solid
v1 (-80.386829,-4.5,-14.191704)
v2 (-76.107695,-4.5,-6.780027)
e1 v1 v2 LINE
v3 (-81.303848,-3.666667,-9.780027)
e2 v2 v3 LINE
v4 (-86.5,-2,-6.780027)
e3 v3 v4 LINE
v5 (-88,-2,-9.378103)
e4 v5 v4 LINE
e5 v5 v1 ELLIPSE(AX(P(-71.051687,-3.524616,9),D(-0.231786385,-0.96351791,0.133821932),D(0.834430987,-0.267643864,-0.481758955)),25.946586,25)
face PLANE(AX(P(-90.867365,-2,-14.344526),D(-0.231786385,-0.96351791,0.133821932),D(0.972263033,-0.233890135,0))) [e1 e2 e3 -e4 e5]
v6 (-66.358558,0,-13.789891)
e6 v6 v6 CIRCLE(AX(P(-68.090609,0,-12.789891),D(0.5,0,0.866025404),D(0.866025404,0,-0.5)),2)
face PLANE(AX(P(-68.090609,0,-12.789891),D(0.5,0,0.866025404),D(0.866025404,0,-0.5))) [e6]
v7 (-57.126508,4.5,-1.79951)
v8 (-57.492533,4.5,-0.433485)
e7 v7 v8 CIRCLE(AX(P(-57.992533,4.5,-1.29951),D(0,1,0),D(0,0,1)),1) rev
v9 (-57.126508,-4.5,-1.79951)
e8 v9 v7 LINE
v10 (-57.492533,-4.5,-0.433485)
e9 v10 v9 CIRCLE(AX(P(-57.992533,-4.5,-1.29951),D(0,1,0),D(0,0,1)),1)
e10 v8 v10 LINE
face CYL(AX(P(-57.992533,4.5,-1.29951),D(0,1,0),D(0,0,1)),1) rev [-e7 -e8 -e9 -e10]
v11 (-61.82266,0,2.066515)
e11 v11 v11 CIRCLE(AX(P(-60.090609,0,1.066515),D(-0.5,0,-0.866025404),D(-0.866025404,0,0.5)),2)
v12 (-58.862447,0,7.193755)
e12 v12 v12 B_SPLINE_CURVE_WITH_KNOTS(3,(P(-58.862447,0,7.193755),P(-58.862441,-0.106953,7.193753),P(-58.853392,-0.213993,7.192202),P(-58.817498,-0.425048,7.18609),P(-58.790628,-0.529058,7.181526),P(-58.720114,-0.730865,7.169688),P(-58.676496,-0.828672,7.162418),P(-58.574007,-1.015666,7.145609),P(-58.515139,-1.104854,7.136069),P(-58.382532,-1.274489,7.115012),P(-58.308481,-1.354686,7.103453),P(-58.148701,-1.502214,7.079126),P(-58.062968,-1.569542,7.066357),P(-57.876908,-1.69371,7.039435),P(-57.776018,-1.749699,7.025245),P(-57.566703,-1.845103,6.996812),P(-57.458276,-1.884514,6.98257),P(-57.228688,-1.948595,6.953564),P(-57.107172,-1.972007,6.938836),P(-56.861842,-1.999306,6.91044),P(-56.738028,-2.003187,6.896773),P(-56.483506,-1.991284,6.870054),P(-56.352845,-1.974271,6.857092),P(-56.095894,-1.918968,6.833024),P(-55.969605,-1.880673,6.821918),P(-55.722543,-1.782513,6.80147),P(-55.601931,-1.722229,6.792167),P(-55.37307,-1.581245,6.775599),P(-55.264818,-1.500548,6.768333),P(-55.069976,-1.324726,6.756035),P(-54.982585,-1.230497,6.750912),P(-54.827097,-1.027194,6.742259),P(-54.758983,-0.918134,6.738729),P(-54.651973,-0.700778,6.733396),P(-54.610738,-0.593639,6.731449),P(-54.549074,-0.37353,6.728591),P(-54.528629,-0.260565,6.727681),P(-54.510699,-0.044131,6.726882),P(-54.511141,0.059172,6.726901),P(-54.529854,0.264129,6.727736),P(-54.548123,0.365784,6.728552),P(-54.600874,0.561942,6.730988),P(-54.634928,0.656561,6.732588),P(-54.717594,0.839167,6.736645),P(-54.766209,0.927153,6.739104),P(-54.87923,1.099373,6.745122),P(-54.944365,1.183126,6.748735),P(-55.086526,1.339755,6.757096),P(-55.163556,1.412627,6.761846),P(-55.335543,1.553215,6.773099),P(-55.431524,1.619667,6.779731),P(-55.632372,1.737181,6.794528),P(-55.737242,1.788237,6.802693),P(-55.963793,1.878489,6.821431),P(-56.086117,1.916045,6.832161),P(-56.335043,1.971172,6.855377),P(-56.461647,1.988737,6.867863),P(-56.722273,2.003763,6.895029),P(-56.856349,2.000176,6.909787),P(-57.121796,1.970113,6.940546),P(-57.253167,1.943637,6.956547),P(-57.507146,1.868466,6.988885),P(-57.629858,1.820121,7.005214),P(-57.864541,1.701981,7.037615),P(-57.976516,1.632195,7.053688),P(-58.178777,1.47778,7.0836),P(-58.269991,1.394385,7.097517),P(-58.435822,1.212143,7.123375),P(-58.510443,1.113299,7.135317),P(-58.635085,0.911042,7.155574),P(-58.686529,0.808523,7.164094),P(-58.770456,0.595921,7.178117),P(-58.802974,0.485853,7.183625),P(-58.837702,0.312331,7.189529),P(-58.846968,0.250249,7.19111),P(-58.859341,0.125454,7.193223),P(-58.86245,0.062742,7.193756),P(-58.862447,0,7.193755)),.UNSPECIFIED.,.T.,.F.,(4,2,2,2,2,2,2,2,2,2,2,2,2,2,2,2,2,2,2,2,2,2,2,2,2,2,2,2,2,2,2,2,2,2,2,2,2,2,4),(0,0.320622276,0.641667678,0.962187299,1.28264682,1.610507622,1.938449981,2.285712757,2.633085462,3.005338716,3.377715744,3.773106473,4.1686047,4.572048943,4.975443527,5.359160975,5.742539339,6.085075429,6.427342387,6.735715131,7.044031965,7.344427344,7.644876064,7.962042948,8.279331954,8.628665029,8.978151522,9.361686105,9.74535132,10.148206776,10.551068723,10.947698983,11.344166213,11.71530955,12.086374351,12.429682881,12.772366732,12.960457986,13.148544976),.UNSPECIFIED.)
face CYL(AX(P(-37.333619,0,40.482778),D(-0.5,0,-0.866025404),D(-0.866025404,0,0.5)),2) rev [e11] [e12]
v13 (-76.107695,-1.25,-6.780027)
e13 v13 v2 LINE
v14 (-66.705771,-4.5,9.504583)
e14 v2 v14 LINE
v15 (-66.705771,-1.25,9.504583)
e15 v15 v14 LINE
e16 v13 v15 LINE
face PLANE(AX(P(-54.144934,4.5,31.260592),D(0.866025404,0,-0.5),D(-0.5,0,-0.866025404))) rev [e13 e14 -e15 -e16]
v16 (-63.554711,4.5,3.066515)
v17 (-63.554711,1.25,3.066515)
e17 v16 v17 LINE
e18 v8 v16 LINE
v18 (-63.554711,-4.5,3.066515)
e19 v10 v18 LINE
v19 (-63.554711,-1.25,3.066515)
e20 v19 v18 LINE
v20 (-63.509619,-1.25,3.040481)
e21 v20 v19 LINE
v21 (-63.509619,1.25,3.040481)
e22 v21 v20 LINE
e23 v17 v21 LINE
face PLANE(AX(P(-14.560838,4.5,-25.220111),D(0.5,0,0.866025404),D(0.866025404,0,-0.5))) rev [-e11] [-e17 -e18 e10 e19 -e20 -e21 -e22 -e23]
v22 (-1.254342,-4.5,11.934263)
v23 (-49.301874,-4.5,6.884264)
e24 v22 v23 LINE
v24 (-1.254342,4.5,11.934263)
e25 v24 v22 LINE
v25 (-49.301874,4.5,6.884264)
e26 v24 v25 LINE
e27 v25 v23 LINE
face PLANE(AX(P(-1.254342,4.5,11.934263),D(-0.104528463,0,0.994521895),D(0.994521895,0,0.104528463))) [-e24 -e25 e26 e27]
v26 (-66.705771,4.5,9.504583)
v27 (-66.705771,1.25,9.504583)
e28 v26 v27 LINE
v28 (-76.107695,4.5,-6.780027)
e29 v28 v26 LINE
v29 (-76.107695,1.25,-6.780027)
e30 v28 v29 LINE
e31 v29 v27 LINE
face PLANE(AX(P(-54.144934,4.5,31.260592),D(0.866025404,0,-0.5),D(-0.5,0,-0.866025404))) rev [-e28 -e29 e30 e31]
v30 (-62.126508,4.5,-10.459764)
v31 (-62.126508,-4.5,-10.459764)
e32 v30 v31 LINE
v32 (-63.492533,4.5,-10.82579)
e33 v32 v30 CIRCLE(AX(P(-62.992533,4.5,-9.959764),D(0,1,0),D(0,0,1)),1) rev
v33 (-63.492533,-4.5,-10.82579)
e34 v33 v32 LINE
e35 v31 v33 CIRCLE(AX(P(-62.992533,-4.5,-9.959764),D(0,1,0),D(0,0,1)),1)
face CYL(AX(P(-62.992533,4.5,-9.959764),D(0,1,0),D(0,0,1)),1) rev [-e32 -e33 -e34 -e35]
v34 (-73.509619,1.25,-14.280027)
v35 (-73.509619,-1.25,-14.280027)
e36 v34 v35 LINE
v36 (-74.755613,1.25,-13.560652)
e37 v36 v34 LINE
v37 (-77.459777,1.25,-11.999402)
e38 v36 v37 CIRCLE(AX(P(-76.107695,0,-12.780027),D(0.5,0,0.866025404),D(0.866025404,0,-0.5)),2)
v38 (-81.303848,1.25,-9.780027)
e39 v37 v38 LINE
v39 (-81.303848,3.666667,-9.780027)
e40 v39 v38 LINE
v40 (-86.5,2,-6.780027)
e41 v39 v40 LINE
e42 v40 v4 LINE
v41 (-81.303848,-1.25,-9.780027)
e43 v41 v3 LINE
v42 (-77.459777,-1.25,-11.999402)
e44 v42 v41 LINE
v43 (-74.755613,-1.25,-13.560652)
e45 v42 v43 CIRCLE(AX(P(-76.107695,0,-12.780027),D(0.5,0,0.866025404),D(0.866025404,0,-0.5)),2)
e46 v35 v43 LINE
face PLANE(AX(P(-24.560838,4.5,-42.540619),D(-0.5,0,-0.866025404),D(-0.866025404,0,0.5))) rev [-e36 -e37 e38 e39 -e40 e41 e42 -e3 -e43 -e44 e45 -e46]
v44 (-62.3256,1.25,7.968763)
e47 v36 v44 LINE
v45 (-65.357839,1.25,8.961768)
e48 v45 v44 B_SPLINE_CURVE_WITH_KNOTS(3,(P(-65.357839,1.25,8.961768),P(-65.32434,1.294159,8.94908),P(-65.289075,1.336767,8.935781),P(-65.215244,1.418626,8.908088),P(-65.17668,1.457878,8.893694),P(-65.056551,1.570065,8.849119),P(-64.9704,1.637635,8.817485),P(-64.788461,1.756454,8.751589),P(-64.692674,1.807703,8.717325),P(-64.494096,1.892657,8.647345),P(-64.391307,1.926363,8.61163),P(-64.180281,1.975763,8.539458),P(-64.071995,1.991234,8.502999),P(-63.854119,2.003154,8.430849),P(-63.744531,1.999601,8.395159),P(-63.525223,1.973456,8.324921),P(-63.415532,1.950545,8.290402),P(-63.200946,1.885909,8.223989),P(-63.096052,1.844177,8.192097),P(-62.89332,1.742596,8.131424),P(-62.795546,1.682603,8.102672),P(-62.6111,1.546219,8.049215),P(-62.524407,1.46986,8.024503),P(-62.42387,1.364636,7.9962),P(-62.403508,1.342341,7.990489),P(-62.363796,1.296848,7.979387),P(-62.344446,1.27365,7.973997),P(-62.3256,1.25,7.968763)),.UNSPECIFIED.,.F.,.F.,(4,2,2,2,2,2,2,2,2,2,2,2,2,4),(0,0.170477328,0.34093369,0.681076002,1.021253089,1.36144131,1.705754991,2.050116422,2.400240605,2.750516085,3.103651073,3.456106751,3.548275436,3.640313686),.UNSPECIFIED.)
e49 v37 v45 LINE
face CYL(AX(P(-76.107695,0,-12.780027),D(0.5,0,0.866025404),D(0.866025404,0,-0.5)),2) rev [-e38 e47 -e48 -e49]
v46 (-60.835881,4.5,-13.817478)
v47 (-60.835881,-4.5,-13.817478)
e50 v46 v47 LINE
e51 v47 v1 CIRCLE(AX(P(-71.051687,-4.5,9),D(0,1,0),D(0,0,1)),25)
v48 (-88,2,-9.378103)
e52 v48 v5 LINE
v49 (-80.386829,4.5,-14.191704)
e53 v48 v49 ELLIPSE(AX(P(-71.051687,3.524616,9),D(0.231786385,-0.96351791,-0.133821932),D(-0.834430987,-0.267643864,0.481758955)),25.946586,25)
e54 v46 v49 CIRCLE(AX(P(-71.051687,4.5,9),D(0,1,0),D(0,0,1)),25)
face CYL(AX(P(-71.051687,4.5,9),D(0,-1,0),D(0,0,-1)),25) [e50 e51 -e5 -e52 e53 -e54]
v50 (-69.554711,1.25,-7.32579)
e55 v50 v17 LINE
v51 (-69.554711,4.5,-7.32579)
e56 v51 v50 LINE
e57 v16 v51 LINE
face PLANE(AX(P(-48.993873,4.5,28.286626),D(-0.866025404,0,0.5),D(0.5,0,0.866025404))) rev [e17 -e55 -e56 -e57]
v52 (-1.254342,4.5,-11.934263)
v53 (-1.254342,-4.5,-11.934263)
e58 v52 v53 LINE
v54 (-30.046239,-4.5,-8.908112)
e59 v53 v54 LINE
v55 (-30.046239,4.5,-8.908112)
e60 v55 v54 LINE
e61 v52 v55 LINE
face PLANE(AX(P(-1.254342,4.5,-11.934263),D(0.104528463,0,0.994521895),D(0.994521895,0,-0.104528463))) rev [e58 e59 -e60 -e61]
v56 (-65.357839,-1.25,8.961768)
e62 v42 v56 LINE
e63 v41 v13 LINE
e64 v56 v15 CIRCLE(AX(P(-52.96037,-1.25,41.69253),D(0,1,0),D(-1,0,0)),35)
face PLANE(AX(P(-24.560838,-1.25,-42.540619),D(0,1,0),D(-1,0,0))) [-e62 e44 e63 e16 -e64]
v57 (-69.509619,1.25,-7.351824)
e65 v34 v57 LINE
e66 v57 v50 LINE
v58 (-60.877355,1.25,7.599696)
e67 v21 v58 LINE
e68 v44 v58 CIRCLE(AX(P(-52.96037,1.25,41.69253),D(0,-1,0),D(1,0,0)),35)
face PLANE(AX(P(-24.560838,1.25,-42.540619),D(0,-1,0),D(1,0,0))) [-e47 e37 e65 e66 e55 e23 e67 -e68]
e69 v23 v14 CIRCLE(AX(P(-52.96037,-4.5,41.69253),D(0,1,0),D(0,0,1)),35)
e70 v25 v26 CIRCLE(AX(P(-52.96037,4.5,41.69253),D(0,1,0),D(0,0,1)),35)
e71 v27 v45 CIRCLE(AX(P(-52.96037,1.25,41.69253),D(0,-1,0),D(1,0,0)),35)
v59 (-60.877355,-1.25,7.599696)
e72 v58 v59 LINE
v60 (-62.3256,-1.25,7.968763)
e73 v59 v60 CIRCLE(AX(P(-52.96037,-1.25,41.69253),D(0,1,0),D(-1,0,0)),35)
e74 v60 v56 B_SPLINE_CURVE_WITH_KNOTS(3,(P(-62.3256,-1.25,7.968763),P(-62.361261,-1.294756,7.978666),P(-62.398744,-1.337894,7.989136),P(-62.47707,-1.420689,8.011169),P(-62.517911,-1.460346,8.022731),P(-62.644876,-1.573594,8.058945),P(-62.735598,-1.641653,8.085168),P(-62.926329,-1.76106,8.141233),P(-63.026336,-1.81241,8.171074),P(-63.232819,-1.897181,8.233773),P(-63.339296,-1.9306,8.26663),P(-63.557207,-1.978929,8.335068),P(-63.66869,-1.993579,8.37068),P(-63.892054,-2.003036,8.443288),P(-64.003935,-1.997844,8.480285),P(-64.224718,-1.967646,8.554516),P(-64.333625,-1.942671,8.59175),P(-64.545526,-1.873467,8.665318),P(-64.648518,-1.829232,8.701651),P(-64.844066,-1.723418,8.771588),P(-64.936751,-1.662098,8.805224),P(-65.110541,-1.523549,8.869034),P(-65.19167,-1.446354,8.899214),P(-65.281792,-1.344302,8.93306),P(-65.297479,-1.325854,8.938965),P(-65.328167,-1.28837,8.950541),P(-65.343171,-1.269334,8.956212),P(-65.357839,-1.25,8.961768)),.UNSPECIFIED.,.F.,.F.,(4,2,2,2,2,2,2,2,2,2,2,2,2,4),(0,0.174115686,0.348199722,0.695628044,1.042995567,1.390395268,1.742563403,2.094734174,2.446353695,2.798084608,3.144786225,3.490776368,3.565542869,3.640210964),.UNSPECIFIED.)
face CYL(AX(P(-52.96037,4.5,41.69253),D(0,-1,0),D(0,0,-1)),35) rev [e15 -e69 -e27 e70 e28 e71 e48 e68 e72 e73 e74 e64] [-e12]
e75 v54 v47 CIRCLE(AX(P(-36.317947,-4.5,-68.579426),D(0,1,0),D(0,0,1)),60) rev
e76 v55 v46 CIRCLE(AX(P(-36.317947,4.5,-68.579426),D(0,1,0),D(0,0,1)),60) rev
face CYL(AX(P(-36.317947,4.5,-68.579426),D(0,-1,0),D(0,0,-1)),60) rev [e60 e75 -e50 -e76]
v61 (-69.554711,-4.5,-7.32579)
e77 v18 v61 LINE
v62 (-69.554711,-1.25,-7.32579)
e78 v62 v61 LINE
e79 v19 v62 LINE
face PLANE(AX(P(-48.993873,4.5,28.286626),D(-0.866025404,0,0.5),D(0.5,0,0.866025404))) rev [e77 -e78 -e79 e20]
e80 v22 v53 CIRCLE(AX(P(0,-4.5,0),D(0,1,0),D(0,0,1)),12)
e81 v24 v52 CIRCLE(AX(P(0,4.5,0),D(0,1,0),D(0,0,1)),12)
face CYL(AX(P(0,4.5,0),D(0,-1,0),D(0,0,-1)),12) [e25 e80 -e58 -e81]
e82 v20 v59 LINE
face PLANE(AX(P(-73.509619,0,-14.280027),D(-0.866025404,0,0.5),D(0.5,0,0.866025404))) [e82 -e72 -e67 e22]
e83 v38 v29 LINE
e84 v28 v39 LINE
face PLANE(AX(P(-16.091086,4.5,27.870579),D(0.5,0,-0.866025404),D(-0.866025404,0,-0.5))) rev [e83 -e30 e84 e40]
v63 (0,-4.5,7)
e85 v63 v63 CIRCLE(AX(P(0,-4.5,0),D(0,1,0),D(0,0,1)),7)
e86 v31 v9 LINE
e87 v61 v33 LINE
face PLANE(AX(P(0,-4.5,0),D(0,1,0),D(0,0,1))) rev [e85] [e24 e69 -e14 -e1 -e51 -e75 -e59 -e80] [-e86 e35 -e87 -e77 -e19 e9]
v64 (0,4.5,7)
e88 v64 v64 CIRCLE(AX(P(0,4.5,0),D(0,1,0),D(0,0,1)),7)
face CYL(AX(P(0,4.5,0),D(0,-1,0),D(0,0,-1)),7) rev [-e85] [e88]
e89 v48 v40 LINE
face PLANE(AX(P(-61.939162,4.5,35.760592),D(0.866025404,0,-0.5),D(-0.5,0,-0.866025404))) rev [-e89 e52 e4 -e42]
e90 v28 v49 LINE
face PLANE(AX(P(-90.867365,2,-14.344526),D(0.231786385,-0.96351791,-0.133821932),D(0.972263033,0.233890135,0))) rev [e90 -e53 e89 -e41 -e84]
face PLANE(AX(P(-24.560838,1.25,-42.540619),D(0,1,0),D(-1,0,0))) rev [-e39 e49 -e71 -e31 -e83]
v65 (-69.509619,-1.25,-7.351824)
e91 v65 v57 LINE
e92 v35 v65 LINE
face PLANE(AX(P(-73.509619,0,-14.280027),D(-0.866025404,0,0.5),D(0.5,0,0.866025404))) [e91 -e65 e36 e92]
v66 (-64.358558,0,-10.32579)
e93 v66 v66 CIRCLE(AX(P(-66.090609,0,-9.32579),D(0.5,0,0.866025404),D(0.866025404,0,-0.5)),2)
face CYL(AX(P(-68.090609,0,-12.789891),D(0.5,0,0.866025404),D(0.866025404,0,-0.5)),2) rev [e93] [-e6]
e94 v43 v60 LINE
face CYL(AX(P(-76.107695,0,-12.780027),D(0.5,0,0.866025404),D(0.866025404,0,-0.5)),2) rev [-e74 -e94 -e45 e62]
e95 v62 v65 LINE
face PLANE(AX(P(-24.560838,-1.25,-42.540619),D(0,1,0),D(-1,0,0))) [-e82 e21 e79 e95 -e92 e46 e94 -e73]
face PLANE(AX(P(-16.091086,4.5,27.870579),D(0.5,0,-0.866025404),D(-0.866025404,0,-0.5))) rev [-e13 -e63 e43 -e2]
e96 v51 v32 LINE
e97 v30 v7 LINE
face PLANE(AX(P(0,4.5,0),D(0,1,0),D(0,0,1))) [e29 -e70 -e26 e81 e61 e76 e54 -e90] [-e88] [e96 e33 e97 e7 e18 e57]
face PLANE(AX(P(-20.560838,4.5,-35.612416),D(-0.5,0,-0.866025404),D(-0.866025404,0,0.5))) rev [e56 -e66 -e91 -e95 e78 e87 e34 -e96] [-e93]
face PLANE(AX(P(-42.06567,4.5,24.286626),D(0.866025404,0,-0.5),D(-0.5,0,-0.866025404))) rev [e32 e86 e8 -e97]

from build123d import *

# Parameters (mm, degrees)
SKETCH1_R           = 7
BOSS_EXTRUDE1_DEPTH = 4.5
SKETCH3_R           = 2
CUT_EXTRUDE1_DEPTH  = 4
SKETCH4_R           = 2
CUT_EXTRUDE2_DEPTH  = 83.455425528
CUT_EXTRUDE3_DEPTH  = 83.769471168
CUT_EXTRUDE4_DEPTH  = 24
FILLET2_R           = 1
CUT_EXTRUDE5_DEPTH  = 1.264527456


# Read off the part's stored shape, not the designer's step: Cut-Extrude5
with BuildPart() as part:
    # Sketch1 → Boss-Extrude1 (new, symmetric)
    # profile 1 of 2: a face of its own
    with BuildSketch(Plane(origin=(0, 0, 0), x_dir=(1, 0, 0), z_dir=(0, 1, 0))):
        with BuildLine():
            ThreePointArc((-1.254341559, -11.934262744), (12, 0), (-1.254341559, 11.934262744))
            Line((-1.254341559, 11.934262744), (-30.046239367, 8.908112343))
            ThreePointArc((-30.046239367, 8.908112343), (-45.765521358, 9.327899994), (-60.835880843, 13.817478255))
            ThreePointArc((-60.835880843, 13.817478255), (-67.496359977, 15.745901742), (-74.430347821, 15.770640847))
            Line((-74.430347821, 15.770640847), (-69.554710794, 7.325789796))
            Line((-69.554710794, 7.325789796), (-62.626507563, 11.325789796))
            Line((-62.626507563, 11.325789796), (-56.626507563, 0.933484951))
            Line((-56.626507563, 0.933484951), (-63.554710794, -3.066515049))
            Line((-63.554710794, -3.066515049), (-60.930347821, -7.612045055))
            ThreePointArc((-60.930347821, -7.612045055), (-55.146607543, -6.760877199), (-49.301873665, -6.884263626))
            Line((-49.301873665, -6.884263626), (-1.254341559, -11.934262744))
        make_face()
        with Locations(Location((0, 0, 0), (0, 0, 270))):
            Circle(SKETCH1_R, mode=Mode.SUBTRACT)
    # profile 2 of 2: a face of its own
    with BuildSketch(Plane(origin=(0, 0, 0), x_dir=(1, 0, 0), z_dir=(0, 1, 0))):
        with BuildLine():
            Line((-69.554710794, 7.325789796), (-74.430347821, 15.770640847))
            ThreePointArc((-74.430347821, 15.770640847), (-81.705916239, 13.616086965), (-88, 9.37810303))
            Line((-88, 9.37810303), (-86.5, 6.780026819))
            Line((-86.5, 6.780026819), (-81.303847577, 9.780026819))
            Line((-81.303847577, 9.780026819), (-76.107695155, 6.780026819))
            Line((-76.107695155, 6.780026819), (-66.705771366, -9.504582872))
            ThreePointArc((-66.705771366, -9.504582872), (-63.859216184, -8.432717138), (-60.930347821, -7.612045055))
            Line((-60.930347821, -7.612045055), (-63.554710794, -3.066515049))
            Line((-63.554710794, -3.066515049), (-69.554710794, 7.325789796))
        make_face()
    extrude(amount=BOSS_EXTRUDE1_DEPTH, both=True)

    # Sketch3 → Cut-Extrude1 (cut)
    with BuildSketch(Plane(origin=(-20.560837732, 0, -35.612415597), x_dir=(0.8660254037844358, 0, -0.5000000000000051), z_dir=(0.500000000000005, 0, 0.8660254037844357))):
        with Locations((-52.573251602, 0)):
            Circle(SKETCH3_R)
    extrude(amount=-CUT_EXTRUDE1_DEPTH, mode=Mode.SUBTRACT)

    # Sketch4 → Cut-Extrude2 (cut, through all)
    with BuildSketch(Plane(origin=(-14.560837732, 0, -25.220110752), x_dir=(-0.8660254037844364, 0, 0.5000000000000041), z_dir=(-0.5000000000000041, 0, -0.8660254037844364))):
        with Locations(Location((52.573251602, 0, 0), (0, 0, 180))):
            Circle(SKETCH4_R)
    extrude(amount=-CUT_EXTRUDE2_DEPTH, mode=Mode.SUBTRACT)

    # Sketch6 → Cut-Extrude3 (cut, through all)
    with BuildSketch(Plane(origin=(-12.560837732, 0, -21.756009137), x_dir=(0.8660254037844358, 0, -0.5000000000000051), z_dir=(0.500000000000005, 0, 0.8660254037844357))):
        Polygon((-71.521184018, -2), (-62.521184018, -4.5), (-71.521184018, -4.5), align=None)
        Polygon((-62.521184018, 4.5), (-71.521184018, 4.5), (-71.521184018, 2), align=None)
    extrude(amount=-CUT_EXTRUDE3_DEPTH, mode=Mode.SUBTRACT)

    # Sketch6<4> → Cut-Extrude4 (cut)
    with BuildSketch(Plane(origin=(-12.560837732, 0, -21.756009137), x_dir=(0.8660254037844358, 0, -0.5000000000000051), z_dir=(0.500000000000005, 0, 0.8660254037844357))):
        with BuildLine():
            Line((-61.082433518, -1.25), (-65.521184018, -1.25))
            Line((-65.521184018, -1.25), (-65.521184018, 1.25))
            Line((-65.521184018, 1.25), (-61.082433518, 1.25))
            ThreePointArc((-61.082433518, 1.25), (-59.521184018, 2), (-57.959934518, 1.25))
            Line((-57.959934518, 1.25), (-56.521184018, 1.25))
            Line((-56.521184018, 1.25), (-56.521184018, -1.25))
            Line((-56.521184018, -1.25), (-57.959934518, -1.25))
            ThreePointArc((-57.959934518, -1.25), (-59.521184018, -2), (-61.082433518, -1.25))
        make_face()
    extrude(amount=-CUT_EXTRUDE4_DEPTH, mode=Mode.SUBTRACT)

    # Fillet2
    fillet2_edges = [part.edges().sort_by_distance(p)[0] for p in [
        (-56.626507563, 0, -0.933484951),
        (-62.626507563, 0, -11.325789796),
    ]]
    fillet(fillet2_edges, radius=FILLET2_R)

    # Cut-Extrude5 outline → Cut-Extrude5 (cut)
    with BuildSketch(Plane(origin=(-12.560837732, 0, -21.756009137), x_dir=(0.8660254037844358, 0, -0.5000000000000051), z_dir=(0.500000000000005, 0, 0.8660254037844357))):
        with BuildLine():
            ThreePointArc((-57.959934518, 1.25), (-59.521184018, 2), (-61.082433518, 1.25))
            Line((-61.082433518, 1.25), (-62.521184018, 1.25))
            Line((-62.521184018, 1.25), (-62.521184018, -1.25))
            Line((-62.521184018, -1.25), (-61.082433518, -1.25))
            ThreePointArc((-61.082433518, -1.25), (-59.521184018, -2), (-57.959934518, -1.25))
            Line((-57.959934518, -1.25), (-56.521184018, -1.25))
            Line((-56.521184018, -1.25), (-56.521184018, 1.25))
            Line((-56.521184018, 1.25), (-57.959934518, 1.25))
        make_face()
    extrude(amount=CUT_EXTRUDE5_DEPTH, mode=Mode.SUBTRACT)


solid = part.part
